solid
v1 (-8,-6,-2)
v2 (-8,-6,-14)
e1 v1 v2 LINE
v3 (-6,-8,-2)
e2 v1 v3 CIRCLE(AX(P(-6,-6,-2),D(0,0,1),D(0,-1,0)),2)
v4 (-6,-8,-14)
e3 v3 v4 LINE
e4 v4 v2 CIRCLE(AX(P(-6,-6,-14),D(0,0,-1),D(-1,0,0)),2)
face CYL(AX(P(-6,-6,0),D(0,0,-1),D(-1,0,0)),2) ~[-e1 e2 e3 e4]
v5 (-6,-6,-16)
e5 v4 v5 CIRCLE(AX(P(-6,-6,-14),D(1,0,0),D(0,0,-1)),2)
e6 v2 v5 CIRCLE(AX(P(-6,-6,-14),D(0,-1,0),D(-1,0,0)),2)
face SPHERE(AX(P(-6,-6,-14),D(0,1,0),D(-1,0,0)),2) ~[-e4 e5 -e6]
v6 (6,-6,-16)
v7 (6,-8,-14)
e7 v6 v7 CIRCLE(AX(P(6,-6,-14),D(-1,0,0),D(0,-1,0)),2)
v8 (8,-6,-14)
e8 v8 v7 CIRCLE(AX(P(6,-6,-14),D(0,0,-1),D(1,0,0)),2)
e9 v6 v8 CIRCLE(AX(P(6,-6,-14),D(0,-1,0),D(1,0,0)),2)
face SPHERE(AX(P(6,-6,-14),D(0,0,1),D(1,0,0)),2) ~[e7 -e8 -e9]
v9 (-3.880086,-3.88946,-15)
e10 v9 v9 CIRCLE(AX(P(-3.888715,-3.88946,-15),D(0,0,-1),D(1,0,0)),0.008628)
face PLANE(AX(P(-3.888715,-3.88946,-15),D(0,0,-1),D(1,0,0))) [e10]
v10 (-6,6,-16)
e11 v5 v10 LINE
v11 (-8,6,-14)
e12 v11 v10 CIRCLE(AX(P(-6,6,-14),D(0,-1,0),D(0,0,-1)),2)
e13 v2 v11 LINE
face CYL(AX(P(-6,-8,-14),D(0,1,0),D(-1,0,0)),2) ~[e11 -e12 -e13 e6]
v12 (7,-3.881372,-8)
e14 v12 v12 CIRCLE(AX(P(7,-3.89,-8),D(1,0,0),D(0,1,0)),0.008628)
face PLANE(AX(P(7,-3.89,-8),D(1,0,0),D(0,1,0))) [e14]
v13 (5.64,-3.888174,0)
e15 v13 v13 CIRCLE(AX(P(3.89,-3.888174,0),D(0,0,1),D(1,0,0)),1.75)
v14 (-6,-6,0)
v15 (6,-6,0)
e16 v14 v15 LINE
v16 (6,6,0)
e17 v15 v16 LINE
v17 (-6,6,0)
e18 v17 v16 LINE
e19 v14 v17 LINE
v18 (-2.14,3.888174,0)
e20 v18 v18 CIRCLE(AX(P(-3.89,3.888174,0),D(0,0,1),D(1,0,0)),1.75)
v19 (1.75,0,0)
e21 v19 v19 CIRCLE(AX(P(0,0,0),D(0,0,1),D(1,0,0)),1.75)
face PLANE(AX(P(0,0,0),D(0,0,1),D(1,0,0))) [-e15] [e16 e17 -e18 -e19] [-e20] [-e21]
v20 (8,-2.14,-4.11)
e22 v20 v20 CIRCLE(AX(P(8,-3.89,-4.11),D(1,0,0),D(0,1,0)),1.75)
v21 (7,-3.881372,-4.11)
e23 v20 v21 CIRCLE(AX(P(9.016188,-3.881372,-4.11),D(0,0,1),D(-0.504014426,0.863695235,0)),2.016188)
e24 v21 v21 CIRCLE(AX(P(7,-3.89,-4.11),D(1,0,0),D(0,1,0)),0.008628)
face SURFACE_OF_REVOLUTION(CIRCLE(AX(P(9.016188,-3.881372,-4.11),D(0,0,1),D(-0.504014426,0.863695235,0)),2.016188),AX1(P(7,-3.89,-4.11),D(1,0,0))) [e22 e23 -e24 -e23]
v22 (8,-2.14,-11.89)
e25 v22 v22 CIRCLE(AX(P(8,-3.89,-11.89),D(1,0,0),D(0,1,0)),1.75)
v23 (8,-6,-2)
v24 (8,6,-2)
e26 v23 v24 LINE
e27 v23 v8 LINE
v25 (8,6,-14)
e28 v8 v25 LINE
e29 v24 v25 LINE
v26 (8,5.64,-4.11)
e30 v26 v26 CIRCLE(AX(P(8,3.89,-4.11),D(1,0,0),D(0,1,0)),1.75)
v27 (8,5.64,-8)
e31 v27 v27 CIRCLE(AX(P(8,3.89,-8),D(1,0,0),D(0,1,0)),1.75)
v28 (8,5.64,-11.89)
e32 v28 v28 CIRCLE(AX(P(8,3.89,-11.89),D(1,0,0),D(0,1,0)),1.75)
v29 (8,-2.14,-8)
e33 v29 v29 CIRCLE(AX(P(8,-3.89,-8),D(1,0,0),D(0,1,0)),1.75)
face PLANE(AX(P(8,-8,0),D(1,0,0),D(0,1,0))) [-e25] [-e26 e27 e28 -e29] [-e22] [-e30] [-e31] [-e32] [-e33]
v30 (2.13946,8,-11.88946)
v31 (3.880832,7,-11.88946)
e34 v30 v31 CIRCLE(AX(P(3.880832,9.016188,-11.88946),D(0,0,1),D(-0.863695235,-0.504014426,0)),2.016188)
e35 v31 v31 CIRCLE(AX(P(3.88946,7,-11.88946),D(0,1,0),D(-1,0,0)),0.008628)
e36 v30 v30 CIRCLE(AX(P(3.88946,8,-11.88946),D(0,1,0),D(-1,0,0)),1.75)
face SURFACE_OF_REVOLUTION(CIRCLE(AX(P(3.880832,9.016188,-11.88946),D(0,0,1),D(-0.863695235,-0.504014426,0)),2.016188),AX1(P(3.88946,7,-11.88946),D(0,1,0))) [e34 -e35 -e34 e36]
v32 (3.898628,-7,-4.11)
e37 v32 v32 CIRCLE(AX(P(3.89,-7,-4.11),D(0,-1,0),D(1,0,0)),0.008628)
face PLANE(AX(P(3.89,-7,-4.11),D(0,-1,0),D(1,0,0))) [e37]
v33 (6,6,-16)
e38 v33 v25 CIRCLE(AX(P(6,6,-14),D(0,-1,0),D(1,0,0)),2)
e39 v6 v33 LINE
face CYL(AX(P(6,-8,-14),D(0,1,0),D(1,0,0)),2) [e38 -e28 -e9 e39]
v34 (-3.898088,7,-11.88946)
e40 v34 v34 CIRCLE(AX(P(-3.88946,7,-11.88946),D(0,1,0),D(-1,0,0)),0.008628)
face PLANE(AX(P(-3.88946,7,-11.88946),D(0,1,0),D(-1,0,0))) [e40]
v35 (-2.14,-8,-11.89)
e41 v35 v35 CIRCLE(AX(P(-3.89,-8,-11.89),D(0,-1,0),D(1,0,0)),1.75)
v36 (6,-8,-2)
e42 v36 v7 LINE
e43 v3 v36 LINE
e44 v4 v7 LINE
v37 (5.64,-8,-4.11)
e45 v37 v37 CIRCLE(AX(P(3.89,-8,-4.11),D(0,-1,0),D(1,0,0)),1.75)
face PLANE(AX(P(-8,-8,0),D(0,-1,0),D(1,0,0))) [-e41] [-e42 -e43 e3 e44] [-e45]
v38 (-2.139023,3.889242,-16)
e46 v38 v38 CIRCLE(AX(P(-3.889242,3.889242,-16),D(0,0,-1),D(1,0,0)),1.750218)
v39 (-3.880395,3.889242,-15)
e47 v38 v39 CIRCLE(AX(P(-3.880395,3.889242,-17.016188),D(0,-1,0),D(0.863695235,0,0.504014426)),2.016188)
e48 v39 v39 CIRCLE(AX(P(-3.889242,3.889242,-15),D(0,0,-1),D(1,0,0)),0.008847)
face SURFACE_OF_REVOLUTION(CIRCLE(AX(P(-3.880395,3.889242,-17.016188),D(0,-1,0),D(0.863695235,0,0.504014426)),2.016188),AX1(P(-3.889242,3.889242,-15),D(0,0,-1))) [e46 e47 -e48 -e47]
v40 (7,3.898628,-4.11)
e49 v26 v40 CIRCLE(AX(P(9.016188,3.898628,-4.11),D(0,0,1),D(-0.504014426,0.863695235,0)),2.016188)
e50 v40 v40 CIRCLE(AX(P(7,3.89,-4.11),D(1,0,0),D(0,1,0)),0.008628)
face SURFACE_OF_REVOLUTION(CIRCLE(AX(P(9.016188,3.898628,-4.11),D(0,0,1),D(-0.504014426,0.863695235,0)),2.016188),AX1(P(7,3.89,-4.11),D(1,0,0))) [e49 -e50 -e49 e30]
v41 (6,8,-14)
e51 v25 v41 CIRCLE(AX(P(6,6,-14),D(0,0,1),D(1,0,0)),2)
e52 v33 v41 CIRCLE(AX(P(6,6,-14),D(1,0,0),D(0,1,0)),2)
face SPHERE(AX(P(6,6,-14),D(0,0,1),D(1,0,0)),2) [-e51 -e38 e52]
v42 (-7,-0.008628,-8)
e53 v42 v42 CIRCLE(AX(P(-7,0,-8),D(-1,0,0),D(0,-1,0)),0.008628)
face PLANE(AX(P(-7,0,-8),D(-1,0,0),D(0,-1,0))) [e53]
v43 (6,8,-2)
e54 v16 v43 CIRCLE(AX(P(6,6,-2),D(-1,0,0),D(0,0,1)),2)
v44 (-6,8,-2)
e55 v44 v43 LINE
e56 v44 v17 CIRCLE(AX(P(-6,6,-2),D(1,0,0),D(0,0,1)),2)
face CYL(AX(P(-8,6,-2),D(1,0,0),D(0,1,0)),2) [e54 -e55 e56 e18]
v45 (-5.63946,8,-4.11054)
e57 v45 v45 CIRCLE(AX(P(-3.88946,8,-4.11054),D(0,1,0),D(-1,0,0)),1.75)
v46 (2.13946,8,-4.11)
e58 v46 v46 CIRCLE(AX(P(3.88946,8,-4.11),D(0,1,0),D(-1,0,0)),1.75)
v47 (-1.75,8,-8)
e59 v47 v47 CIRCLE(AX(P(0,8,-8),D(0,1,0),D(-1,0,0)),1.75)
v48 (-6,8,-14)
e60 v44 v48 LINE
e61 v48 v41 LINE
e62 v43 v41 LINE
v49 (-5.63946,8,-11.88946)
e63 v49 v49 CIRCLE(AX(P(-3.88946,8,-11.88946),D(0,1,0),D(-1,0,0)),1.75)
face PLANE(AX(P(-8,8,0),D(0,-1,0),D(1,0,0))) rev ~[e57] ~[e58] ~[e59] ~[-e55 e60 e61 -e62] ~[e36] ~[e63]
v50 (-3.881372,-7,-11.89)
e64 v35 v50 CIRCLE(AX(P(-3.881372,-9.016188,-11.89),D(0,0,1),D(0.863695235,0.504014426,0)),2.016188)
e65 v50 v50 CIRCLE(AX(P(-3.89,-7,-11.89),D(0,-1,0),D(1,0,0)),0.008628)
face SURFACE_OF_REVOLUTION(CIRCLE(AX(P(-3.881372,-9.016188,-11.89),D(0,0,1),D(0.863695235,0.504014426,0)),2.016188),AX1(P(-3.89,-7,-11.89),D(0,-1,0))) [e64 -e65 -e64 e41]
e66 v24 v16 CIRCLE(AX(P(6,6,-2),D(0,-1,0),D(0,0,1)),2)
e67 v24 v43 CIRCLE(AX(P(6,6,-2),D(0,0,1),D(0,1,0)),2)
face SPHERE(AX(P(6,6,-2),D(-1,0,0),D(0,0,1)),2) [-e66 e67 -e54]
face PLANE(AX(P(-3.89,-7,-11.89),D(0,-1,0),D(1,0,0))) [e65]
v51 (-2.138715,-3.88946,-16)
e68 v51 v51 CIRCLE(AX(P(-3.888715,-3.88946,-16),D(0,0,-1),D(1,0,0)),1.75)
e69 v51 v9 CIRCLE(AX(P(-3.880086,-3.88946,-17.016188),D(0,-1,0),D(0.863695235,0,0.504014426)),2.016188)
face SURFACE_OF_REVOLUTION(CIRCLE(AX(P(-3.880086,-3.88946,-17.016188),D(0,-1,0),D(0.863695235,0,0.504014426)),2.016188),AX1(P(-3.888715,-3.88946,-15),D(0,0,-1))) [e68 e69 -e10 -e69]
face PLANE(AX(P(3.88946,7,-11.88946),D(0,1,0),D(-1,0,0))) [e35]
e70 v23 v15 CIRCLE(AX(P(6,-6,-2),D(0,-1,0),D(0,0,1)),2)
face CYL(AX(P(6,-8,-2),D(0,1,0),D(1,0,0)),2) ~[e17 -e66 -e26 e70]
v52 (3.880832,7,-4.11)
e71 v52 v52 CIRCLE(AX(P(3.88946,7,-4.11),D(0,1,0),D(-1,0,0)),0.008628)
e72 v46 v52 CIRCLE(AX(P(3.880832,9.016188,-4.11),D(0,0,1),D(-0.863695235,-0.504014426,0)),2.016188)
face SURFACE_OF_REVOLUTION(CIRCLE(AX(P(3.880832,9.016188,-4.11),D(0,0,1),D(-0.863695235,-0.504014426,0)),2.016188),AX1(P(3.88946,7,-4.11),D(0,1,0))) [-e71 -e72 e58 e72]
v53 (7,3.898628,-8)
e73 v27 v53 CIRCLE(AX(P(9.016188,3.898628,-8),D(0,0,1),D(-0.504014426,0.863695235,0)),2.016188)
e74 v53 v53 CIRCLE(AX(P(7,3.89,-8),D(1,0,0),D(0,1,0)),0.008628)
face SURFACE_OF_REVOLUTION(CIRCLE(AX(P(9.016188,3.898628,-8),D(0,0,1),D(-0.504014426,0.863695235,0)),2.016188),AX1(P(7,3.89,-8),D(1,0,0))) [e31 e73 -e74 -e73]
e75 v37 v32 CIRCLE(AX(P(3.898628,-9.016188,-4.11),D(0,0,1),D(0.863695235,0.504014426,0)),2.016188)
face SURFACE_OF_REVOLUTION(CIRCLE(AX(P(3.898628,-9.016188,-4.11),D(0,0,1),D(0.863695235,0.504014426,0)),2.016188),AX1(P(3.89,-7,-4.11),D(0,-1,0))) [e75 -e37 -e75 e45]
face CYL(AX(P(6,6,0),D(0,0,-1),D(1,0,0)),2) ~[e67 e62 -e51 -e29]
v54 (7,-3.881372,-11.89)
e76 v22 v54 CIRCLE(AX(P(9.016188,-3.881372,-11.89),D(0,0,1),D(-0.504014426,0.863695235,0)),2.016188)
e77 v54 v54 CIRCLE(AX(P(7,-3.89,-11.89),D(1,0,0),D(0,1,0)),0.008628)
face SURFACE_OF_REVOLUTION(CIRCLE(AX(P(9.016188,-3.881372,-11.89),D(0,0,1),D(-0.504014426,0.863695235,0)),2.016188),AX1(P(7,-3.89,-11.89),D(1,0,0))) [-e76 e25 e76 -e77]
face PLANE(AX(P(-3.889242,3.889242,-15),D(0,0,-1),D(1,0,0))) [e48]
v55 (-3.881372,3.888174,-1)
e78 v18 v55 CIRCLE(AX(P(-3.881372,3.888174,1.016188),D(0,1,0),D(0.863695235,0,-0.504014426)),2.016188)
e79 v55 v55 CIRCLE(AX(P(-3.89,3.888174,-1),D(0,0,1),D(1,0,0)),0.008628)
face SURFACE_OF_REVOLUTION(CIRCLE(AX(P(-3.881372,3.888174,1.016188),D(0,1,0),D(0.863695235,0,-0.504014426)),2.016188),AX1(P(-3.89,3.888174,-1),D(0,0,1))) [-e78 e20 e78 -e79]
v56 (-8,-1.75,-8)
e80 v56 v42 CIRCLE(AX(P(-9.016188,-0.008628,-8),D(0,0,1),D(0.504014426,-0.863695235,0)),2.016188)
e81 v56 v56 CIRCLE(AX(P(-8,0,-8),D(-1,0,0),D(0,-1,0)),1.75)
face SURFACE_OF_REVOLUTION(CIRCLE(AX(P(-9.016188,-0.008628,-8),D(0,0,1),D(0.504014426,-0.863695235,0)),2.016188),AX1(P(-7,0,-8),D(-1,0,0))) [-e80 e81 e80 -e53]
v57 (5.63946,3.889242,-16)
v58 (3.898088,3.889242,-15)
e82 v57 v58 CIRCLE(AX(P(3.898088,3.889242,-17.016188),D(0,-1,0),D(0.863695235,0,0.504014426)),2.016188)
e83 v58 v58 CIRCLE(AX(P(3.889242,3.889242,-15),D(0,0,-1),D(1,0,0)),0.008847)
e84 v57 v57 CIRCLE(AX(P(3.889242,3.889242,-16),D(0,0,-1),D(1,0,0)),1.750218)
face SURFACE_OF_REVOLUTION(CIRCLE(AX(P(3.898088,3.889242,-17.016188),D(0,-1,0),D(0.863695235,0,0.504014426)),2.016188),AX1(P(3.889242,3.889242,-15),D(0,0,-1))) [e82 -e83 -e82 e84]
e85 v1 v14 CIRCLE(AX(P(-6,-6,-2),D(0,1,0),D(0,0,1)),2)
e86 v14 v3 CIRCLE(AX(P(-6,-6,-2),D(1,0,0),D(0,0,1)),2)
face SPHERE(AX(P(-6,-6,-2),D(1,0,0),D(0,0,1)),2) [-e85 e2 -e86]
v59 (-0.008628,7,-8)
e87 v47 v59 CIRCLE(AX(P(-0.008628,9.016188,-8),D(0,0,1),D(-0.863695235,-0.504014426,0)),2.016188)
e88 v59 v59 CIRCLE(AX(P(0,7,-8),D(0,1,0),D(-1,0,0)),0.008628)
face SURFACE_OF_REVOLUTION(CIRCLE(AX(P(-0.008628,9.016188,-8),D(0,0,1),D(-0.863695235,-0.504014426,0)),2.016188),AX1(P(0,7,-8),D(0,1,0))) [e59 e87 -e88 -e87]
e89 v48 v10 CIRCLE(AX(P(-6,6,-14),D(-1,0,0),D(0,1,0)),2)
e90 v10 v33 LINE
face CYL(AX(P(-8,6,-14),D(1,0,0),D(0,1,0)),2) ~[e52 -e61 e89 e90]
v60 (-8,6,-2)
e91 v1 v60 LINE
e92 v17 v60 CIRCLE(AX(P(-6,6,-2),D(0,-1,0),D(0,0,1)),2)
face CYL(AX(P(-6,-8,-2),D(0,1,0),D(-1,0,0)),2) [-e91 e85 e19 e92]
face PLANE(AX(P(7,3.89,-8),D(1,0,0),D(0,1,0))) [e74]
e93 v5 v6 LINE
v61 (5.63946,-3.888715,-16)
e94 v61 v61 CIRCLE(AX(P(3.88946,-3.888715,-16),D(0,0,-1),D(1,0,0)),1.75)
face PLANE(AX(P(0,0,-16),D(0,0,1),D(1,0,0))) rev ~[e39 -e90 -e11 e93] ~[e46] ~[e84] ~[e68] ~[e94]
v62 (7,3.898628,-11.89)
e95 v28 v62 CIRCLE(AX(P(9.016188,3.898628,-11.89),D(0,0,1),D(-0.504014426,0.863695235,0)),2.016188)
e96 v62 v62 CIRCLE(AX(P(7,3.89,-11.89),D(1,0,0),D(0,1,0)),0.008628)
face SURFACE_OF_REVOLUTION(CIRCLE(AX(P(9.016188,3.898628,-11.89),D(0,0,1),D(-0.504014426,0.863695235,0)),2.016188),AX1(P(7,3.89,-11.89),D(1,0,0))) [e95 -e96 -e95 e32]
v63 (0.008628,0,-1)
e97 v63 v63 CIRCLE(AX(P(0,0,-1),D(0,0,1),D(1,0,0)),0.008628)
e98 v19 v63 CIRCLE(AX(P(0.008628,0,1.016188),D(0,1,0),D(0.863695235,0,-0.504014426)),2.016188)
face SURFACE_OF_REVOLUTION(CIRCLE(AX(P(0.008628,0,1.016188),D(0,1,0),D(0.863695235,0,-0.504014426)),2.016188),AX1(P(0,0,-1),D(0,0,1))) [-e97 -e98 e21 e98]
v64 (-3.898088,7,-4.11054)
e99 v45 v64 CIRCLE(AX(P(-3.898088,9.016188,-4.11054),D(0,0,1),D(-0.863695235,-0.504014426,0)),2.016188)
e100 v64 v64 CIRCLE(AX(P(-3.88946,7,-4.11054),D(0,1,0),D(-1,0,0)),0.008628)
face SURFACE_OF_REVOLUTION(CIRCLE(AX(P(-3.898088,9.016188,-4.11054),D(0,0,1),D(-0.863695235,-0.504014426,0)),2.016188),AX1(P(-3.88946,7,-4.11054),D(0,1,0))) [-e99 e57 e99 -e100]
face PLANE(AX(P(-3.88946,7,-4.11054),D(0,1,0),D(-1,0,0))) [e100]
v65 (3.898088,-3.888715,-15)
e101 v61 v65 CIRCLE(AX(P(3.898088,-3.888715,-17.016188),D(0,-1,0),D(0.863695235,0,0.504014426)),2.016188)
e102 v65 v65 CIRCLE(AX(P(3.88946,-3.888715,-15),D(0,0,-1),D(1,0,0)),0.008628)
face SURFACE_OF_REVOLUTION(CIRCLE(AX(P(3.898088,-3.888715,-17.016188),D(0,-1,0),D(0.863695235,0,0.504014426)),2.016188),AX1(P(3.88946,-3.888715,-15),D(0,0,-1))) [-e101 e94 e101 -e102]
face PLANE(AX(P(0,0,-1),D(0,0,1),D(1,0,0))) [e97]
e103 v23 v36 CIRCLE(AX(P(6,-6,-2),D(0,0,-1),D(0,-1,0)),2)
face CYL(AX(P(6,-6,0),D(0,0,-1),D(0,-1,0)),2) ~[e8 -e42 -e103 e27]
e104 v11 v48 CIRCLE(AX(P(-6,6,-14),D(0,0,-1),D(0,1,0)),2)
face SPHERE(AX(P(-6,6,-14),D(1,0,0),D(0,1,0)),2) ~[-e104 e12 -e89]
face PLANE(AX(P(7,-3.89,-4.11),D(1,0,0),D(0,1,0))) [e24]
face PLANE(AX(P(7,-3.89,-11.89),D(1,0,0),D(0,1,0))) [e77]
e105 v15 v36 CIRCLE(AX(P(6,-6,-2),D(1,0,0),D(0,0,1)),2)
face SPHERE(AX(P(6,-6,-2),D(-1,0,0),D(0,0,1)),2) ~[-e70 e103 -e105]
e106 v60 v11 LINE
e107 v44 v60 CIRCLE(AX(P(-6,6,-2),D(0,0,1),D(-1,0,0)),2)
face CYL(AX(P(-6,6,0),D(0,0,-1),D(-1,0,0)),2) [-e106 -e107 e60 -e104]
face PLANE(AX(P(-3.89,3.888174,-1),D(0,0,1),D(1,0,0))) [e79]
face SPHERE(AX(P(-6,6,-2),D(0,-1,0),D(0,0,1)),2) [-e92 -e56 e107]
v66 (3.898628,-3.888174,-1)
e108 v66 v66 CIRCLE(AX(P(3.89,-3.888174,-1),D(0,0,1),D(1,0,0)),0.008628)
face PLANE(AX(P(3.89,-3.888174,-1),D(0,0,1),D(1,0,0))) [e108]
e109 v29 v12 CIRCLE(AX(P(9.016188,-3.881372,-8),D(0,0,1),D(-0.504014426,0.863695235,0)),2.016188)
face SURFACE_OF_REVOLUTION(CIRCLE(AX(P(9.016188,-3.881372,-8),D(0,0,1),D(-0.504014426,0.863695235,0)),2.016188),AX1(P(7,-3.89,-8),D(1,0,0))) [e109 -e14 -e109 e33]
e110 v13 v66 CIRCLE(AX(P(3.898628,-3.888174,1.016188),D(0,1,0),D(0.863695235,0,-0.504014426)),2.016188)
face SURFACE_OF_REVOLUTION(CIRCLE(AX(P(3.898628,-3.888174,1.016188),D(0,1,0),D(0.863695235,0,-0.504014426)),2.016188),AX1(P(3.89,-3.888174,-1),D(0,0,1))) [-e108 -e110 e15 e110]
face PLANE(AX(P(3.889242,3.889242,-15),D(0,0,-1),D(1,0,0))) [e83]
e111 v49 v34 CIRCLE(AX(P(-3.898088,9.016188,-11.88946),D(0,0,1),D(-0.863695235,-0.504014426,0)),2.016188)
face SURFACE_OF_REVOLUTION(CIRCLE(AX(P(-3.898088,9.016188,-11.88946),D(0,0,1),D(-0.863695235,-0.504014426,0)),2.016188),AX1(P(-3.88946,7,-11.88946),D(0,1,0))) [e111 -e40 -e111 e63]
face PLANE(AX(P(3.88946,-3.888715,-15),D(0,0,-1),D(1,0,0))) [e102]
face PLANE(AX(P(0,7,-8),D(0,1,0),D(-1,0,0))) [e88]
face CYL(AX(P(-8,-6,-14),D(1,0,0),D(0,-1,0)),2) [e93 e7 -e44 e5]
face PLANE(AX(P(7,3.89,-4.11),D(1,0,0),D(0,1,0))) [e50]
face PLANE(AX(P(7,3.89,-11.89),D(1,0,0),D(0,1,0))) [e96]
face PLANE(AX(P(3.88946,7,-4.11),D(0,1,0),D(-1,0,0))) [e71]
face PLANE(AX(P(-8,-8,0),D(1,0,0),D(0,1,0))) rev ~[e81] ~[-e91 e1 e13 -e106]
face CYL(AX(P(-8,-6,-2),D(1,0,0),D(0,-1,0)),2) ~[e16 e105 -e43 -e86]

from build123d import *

# Parameters (mm, degrees)
F0_W      = 16
F0_H      = 16
F1_DEPTH  = 16
F2_R      = 2
F3_R      = 1.75
F4_DEPTH  = 1
F8_R      = 1.75
F8_R_2    = 1.7502183246
F9_DEPTH  = 1
F11_R     = 1.75
F12_DEPTH = 1
F14_R     = 1.75
F15_DEPTH = 1
F17_R     = 1.75
F18_DEPTH = 1
F20_R     = 1.75
F21_DEPTH = 1


# Not quite as in the source:
# - a fillet or chamfer that OpenCascade refuses, or shapes differently, is made with other operations: its cross-section is extruded or revolved along the edge and cut away or added


with BuildPart() as f1:
    # F0 (on Top) → F1 (new body)
    with BuildSketch(Plane.XY):
        Rectangle(F0_W, F0_H)
    extrude(amount=-F1_DEPTH)

    # F2
    f2_edges = [f1.edges().sort_by_distance(p)[0] for p in [
        (0, -8, 0),
        (-8, 0, 0),
        (0, 8, 0),
        (8, 0, 0),
        (8, -8, -8),
        (8, 8, -8),
        (8, 0, -16),
        (0, 8, -16),
        (-8, 8, -8),
        (-8, 0, -16),
        (-8, -8, -8),
        (0, -8, -16),
    ]]
    fillet(f2_edges, radius=F2_R)

    # F3 (on face) → F4 (cut)
    with BuildSketch(Plane.XY):
        Circle(F3_R)
        with Locations((3.89, -3.8881743788)):
            Circle(F3_R)
        with Locations((-3.89, 3.8881743788)):
            Circle(F3_R)
    extrude(amount=-F4_DEPTH, mode=Mode.SUBTRACT)

    # F5: fillet of radius 2.016187672 on 1 edges, made by hand

    # F5_s1 → F5_t2 (revolve)
    with BuildSketch(Plane.XZ.offset(3.8881743788)):
        with BuildLine():
            ThreePointArc((5.64, 0), (4.9026670776, -0.7322169988), (3.8986283154, -1))
            Line((3.8986283154, -1), (5.64, -1))
            Line((5.64, -1), (5.64, 0))
        make_face()
    revolve(axis=Axis((3.89, -3.8881743788, -1), (0, 0, 1)))

    # F6: fillet of radius 2.016187672 on 1 edges, made by hand

    # F6_s1 → F6_t2 (revolve)
    with BuildSketch(Plane.XZ):
        with BuildLine():
            ThreePointArc((1.75, 0), (1.0126670776, -0.7322169988), (0.0086283154, -1))
            Line((0.0086283154, -1), (1.75, -1))
            Line((1.75, -1), (1.75, 0))
        make_face()
    revolve(axis=Axis((0, 0, -1), (0, 0, 1)))

    # F7: fillet of radius 2.016187672 on 1 edges, made by hand

    # F7_s1 → F7_t2 (revolve)
    with BuildSketch(Plane.XZ.offset(-3.8881743788)):
        with BuildLine():
            ThreePointArc((-2.14, 0), (-2.8773329224, -0.7322169988), (-3.8813716846, -1))
            Line((-3.8813716846, -1), (-2.14, -1))
            Line((-2.14, -1), (-2.14, 0))
        make_face()
    revolve(axis=Axis((-3.89, 3.8881743788, -1), (0, 0, 1)))

    # F8 (on face) → F9 (cut)
    with BuildSketch(Plane(origin=(0, 0, -16), x_dir=(1, 0, 0), z_dir=(0, 0, -1))):
        with Locations((-3.8887145573, 3.88946)):
            Circle(F8_R)
        with Locations((3.88946, 3.8887145573)):
            Circle(F8_R)
        with Locations((-3.8892416754, -3.8892416754)):
            Circle(F8_R_2)
        with Locations((3.8892416754, -3.8892416754)):
            Circle(F8_R_2)
    extrude(amount=-F9_DEPTH, mode=Mode.SUBTRACT)

    # F10: fillet of radius 2.016187672 on 4 edges, made by hand

    # F10_s1 → F10_t2 (revolve)
    with BuildSketch(Plane.XZ.offset(3.88946)):
        with BuildLine():
            ThreePointArc((-2.1387145573, -16), (-2.8760474797, -15.2677830012), (-3.8800862419, -15))
            Line((-3.8800862419, -15), (-2.1387145573, -15))
            Line((-2.1387145573, -15), (-2.1387145573, -16))
        make_face()
    revolve(axis=Axis((-3.8887145573, -3.88946, -15), (0, 0, -1)))

    # F10_s3 → F10_t4 (revolve)
    with BuildSketch(Plane.XZ.offset(3.8887145573)):
        with BuildLine():
            ThreePointArc((5.63946, -16), (4.9021270776, -15.2677830012), (3.8980883154, -15))
            Line((3.8980883154, -15), (5.63946, -15))
            Line((5.63946, -15), (5.63946, -16))
        make_face()
    revolve(axis=Axis((3.88946, -3.8887145573, -15), (0, 0, -1)))

    # F10_s5 → F10_t6 (revolve)
    with BuildSketch(Plane.XZ.offset(-3.8892416754)):
        with BuildLine():
            ThreePointArc((-2.1390233507, -16), (-2.8763562731, -15.2677830012), (-3.8803950353, -15))
            Line((-3.8803950353, -15), (-2.1390233507, -15))
            Line((-2.1390233507, -15), (-2.1390233507, -16))
        make_face()
    revolve(axis=Axis((-3.8892416754, 3.8892416754, -15), (0, 0, -1)))

    # F10_s7 → F10_t8 (revolve)
    with BuildSketch(Plane.XZ.offset(-3.8892416754)):
        with BuildLine():
            ThreePointArc((5.63946, -16), (4.9021270776, -15.2677830012), (3.8980883154, -15))
            Line((3.8980883154, -15), (5.63946, -15))
            Line((5.63946, -15), (5.63946, -16))
        make_face()
    revolve(axis=Axis((3.8892416754, 3.8892416754, -15), (0, 0, -1)))

    # F11 (on face) → F12 (cut)
    with BuildSketch(Plane(origin=(0, 8, 0), x_dir=(-1, 0, 0), z_dir=(0, 1, 0))):
        with Locations((0, -8)):
            Circle(F11_R)
        with Locations((-3.88946, -4.11)):
            Circle(F11_R)
        with Locations((-3.88946, -11.88946)):
            Circle(F11_R)
        with Locations((3.88946, -11.88946)):
            Circle(F11_R)
        with Locations((3.88946, -4.11054)):
            Circle(F11_R)
    extrude(amount=-F12_DEPTH, mode=Mode.SUBTRACT)

    # F13: fillet of radius 2.016187672 on 5 edges, made by hand

    # F13_s1 → F13_t2 (revolve)
    with BuildSketch(Plane.XY.offset(-4.11)):
        with BuildLine():
            ThreePointArc((2.13946, 8), (2.8767929224, 7.2677830012), (3.8808316846, 7))
            Line((3.8808316846, 7), (2.13946, 7))
            Line((2.13946, 7), (2.13946, 8))
        make_face()
    revolve(axis=Axis((3.88946, 7, -4.11), (0, 1, 0)))

    # F13_s3 → F13_t4 (revolve)
    with BuildSketch(Plane.XY.offset(-8)):
        with BuildLine():
            ThreePointArc((-1.75, 8), (-1.0126670776, 7.2677830012), (-0.0086283154, 7))
            Line((-0.0086283154, 7), (-1.75, 7))
            Line((-1.75, 7), (-1.75, 8))
        make_face()
    revolve(axis=Axis((0, 7, -8), (0, 1, 0)))

    # F13_s5 → F13_t6 (revolve)
    with BuildSketch(Plane.XY.offset(-11.88946)):
        with BuildLine():
            ThreePointArc((2.13946, 8), (2.8767929224, 7.2677830012), (3.8808316846, 7))
            Line((3.8808316846, 7), (2.13946, 7))
            Line((2.13946, 7), (2.13946, 8))
        make_face()
    revolve(axis=Axis((3.88946, 7, -11.88946), (0, 1, 0)))

    # F13_s7 → F13_t8 (revolve)
    with BuildSketch(Plane.XY.offset(-11.88946)):
        with BuildLine():
            ThreePointArc((-5.63946, 8), (-4.9021270776, 7.2677830012), (-3.8980883154, 7))
            Line((-3.8980883154, 7), (-5.63946, 7))
            Line((-5.63946, 7), (-5.63946, 8))
        make_face()
    revolve(axis=Axis((-3.88946, 7, -11.88946), (0, 1, 0)))

    # F13_s9 → F13_t10 (revolve)
    with BuildSketch(Plane.XY.offset(-4.11054)):
        with BuildLine():
            ThreePointArc((-5.63946, 8), (-4.9021270776, 7.2677830012), (-3.8980883154, 7))
            Line((-3.8980883154, 7), (-5.63946, 7))
            Line((-5.63946, 7), (-5.63946, 8))
        make_face()
    revolve(axis=Axis((-3.88946, 7, -4.11054), (0, 1, 0)))

    # F14 (on face) → F15 (cut)
    with BuildSketch(Plane.YZ.offset(8)):
        with Locations((3.89, -4.11)):
            Circle(F14_R)
        with Locations((3.89, -8)):
            Circle(F14_R)
        with Locations((3.89, -11.89)):
            Circle(F14_R)
        with Locations((-3.89, -8)):
            Circle(F14_R)
        with Locations((-3.89, -4.11)):
            Circle(F14_R)
        with Locations((-3.89, -11.89)):
            Circle(F14_R)
    extrude(amount=-F15_DEPTH, mode=Mode.SUBTRACT)

    # F16: fillet of radius 2.016187672 on 6 edges, made by hand

    # F16_s1 → F16_t2 (revolve)
    with BuildSketch(Plane.XY.offset(-11.89)):
        with BuildLine():
            ThreePointArc((8, -2.14), (7.2677830012, -2.8773329224), (7, -3.8813716846))
            Line((7, -3.8813716846), (7, -2.14))
            Line((7, -2.14), (8, -2.14))
        make_face()
    revolve(axis=Axis((7, -3.89, -11.89), (1, 0, 0)))

    # F16_s3 → F16_t4 (revolve)
    with BuildSketch(Plane.XY.offset(-8)):
        with BuildLine():
            ThreePointArc((8, -2.14), (7.2677830012, -2.8773329224), (7, -3.8813716846))
            Line((7, -3.8813716846), (7, -2.14))
            Line((7, -2.14), (8, -2.14))
        make_face()
    revolve(axis=Axis((7, -3.89, -8), (1, 0, 0)))

    # F16_s5 → F16_t6 (revolve)
    with BuildSketch(Plane.XY.offset(-4.11)):
        with BuildLine():
            ThreePointArc((8, -2.14), (7.2677830012, -2.8773329224), (7, -3.8813716846))
            Line((7, -3.8813716846), (7, -2.14))
            Line((7, -2.14), (8, -2.14))
        make_face()
    revolve(axis=Axis((7, -3.89, -4.11), (1, 0, 0)))

    # F16_s7 → F16_t8 (revolve)
    with BuildSketch(Plane.XY.offset(-8)):
        with BuildLine():
            ThreePointArc((8, 5.64), (7.2677830012, 4.9026670776), (7, 3.8986283154))
            Line((7, 3.8986283154), (7, 5.64))
            Line((7, 5.64), (8, 5.64))
        make_face()
    revolve(axis=Axis((7, 3.89, -8), (1, 0, 0)))

    # F16_s9 → F16_t10 (revolve)
    with BuildSketch(Plane.XY.offset(-11.89)):
        with BuildLine():
            ThreePointArc((8, 5.64), (7.2677830012, 4.9026670776), (7, 3.8986283154))
            Line((7, 3.8986283154), (7, 5.64))
            Line((7, 5.64), (8, 5.64))
        make_face()
    revolve(axis=Axis((7, 3.89, -11.89), (1, 0, 0)))

    # F16_s11 → F16_t12 (revolve)
    with BuildSketch(Plane.XY.offset(-4.11)):
        with BuildLine():
            ThreePointArc((8, 5.64), (7.2677830012, 4.9026670776), (7, 3.8986283154))
            Line((7, 3.8986283154), (7, 5.64))
            Line((7, 5.64), (8, 5.64))
        make_face()
    revolve(axis=Axis((7, 3.89, -4.11), (1, 0, 0)))

    # F17 (on face) → F18 (cut)
    with BuildSketch(Plane(origin=(-8, 0, 0), x_dir=(0, -1, 0), z_dir=(-1, 0, 0))):
        with Locations((0, -8)):
            Circle(F17_R)
    extrude(amount=-F18_DEPTH, mode=Mode.SUBTRACT)

    # F19: fillet of radius 2.016187672 on 1 edges, made by hand

    # F19_s1 → F19_t2 (revolve)
    with BuildSketch(Plane.XY.offset(-8)):
        with BuildLine():
            ThreePointArc((-8, -1.75), (-7.2677830012, -1.0126670776), (-7, -0.0086283154))
            Line((-7, -0.0086283154), (-7, -1.75))
            Line((-7, -1.75), (-8, -1.75))
        make_face()
    revolve(axis=Axis((-7, 0, -8), (-1, 0, 0)))

    # F20 (on face) → F21 (cut)
    with BuildSketch(Plane.XZ.offset(8)):
        with Locations((-3.89, -11.89)):
            Circle(F20_R)
        with Locations((3.89, -4.11)):
            Circle(F20_R)
    extrude(amount=-F21_DEPTH, mode=Mode.SUBTRACT)

    # F22: fillet of radius 2.016187672 on 2 edges, made by hand

    # F22_s1 → F22_t2 (revolve)
    with BuildSketch(Plane.XY.offset(-11.89)):
        with BuildLine():
            ThreePointArc((-2.14, -8), (-2.8773329224, -7.2677830012), (-3.8813716846, -7))
            Line((-3.8813716846, -7), (-2.14, -7))
            Line((-2.14, -7), (-2.14, -8))
        make_face()
    revolve(axis=Axis((-3.89, -7, -11.89), (0, -1, 0)))

    # F22_s3 → F22_t4 (revolve)
    with BuildSketch(Plane.XY.offset(-4.11)):
        with BuildLine():
            ThreePointArc((5.64, -8), (4.9026670776, -7.2677830012), (3.8986283154, -7))
            Line((3.8986283154, -7), (5.64, -7))
            Line((5.64, -7), (5.64, -8))
        make_face()
    revolve(axis=Axis((3.89, -7, -4.11), (0, -1, 0)))


solid = f1.part
